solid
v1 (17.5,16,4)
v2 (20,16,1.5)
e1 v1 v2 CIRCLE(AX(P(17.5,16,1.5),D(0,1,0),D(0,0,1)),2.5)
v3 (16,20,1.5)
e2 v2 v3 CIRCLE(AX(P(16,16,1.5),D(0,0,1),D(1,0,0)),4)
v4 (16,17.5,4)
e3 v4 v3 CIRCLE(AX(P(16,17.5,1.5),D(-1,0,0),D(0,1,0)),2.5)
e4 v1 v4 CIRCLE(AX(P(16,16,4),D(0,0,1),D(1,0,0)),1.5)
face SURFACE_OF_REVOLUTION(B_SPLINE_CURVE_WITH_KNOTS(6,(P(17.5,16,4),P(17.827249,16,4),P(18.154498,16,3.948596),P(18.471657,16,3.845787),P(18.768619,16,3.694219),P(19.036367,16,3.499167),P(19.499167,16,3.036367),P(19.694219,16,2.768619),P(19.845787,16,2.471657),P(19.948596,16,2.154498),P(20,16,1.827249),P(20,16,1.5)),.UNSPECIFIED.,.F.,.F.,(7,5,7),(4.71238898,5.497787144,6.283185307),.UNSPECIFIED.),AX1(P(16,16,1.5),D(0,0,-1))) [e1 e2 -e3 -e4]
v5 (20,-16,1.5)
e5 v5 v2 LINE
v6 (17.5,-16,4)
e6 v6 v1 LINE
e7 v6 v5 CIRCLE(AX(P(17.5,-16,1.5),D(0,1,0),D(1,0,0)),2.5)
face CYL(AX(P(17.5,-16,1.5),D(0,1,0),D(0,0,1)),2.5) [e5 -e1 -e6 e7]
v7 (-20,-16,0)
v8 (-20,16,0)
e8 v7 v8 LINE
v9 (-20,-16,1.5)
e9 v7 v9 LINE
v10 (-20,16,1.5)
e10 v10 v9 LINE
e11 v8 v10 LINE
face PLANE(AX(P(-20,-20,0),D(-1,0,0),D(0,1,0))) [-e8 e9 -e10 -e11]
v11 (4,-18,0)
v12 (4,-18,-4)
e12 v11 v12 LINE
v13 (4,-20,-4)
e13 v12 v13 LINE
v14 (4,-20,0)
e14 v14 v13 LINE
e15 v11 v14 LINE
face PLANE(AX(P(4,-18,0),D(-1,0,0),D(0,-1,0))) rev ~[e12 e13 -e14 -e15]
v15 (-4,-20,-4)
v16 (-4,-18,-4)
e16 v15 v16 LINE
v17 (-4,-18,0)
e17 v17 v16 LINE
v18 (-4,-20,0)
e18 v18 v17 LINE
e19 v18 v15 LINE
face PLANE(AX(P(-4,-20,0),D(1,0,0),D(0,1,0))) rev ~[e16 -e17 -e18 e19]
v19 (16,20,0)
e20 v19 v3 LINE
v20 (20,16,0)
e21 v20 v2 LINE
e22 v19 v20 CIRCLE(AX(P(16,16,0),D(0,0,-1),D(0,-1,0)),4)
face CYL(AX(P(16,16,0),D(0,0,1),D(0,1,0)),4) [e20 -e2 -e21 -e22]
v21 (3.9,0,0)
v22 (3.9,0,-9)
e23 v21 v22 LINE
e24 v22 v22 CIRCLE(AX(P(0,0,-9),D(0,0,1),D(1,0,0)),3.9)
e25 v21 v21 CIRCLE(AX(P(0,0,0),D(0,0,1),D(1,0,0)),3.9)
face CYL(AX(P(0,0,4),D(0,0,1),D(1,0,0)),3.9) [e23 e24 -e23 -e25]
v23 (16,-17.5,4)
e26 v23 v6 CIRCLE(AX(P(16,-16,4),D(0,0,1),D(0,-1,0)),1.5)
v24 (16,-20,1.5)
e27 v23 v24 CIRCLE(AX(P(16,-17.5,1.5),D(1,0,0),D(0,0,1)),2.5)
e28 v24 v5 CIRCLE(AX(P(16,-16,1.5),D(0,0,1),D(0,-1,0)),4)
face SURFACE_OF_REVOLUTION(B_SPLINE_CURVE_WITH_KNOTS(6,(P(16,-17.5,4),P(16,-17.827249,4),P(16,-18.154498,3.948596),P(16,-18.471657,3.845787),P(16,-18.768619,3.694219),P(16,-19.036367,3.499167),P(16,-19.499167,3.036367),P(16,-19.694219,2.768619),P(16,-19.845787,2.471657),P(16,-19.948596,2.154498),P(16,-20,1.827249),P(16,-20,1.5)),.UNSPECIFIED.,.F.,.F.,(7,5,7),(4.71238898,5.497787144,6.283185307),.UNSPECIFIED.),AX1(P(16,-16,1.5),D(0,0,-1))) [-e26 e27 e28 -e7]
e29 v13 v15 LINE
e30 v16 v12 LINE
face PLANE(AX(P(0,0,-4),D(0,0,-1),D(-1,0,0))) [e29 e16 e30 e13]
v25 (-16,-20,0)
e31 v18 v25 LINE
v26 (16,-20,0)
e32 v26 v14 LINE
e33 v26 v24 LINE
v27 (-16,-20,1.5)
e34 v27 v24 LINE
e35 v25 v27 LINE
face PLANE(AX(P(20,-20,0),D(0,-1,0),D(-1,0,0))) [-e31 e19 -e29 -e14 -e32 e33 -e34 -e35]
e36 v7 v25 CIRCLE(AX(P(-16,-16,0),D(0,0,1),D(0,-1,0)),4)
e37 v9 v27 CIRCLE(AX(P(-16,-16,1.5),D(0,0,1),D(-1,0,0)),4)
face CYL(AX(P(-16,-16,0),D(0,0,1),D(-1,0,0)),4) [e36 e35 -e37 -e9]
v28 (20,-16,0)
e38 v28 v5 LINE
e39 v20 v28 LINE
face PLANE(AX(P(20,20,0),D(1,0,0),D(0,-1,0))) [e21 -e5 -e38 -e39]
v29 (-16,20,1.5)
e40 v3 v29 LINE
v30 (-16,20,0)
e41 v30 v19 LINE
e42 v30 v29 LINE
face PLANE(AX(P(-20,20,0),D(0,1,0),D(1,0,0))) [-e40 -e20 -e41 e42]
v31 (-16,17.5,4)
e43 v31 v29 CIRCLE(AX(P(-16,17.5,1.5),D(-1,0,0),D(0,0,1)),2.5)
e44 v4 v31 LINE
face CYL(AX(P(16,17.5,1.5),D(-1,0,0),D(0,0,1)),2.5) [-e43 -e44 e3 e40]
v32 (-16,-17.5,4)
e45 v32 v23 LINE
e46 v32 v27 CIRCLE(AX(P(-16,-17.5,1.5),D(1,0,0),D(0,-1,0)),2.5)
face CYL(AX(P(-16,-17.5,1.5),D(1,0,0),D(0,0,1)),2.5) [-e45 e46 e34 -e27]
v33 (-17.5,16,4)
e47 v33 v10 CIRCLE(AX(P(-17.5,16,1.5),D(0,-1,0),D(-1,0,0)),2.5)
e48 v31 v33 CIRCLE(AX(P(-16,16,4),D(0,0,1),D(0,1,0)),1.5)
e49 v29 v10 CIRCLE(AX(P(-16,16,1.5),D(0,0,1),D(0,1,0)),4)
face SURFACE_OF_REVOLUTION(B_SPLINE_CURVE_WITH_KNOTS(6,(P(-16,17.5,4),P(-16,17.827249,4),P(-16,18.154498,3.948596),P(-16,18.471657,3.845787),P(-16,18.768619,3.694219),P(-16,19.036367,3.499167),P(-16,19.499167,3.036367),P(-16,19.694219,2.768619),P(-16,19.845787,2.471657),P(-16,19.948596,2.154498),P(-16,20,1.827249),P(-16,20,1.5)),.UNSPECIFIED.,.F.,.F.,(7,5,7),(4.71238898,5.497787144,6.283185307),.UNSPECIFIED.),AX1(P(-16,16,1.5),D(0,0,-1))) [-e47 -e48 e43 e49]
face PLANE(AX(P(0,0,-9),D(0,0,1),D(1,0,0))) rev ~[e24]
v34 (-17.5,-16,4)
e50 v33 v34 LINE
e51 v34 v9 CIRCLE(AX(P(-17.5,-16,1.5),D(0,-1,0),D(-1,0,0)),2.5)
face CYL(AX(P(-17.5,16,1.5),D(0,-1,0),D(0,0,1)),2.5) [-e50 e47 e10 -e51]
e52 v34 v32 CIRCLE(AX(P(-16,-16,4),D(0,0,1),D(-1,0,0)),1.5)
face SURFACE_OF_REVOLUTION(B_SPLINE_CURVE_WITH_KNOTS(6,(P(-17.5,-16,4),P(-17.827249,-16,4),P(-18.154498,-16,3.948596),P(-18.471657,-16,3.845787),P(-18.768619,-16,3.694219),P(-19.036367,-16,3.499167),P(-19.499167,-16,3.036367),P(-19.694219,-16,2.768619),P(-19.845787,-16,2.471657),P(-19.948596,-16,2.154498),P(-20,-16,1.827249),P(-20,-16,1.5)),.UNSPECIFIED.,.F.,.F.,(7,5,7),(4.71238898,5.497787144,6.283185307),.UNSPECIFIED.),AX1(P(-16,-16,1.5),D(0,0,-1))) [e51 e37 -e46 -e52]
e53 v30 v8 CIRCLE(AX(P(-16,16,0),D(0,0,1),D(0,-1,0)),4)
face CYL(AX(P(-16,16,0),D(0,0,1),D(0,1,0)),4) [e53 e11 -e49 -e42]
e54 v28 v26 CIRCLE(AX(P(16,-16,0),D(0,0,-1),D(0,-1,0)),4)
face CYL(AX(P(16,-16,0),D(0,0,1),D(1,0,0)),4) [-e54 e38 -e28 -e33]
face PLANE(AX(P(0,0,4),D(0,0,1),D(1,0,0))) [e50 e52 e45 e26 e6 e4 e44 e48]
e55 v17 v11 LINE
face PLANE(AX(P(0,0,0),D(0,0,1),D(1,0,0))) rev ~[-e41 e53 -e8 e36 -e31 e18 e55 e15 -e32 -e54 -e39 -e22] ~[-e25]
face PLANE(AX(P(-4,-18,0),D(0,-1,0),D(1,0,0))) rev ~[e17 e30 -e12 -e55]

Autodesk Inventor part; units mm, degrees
ref_plane "YZ Plane" through (0, 0, 0) normal (1, 0, 0) x (0, 1, 0)
ref_plane "XZ Plane" through (0, 0, 0) normal (0, 1, 0) x (-1, 0, 0)
ref_plane "XY Plane" through (0, 0, 0) normal (0, 0, 1) x (1, 0, 0)
sketch "Sketch1" plane through (0, 0, 0) normal (0, 0, 1) x (1, 0, 0)
  line L0 (-20, 20) -> (20, 20)
  line L1 (20, 20) -> (20, -20)
  line L2 (20, -20) -> (-20, -20)
  line L3 (-20, -20) -> (-20, 20)
  point P0 (0, 0)
  point P1 (-20, 0)
  point P2 (0, 20)
  dimension "DimA" = 40
  dimension "DimB" = 40
extrude "Rectangluar End Cap" add sketch "Sketch1" along normal blind 4
sketch "Sketch6" plane through (0, 0, 4) normal (0, 0, 1) x (1, 0, 0)
  line L0 (-20, -20) -> (-20, 20) construction
  line L1 (20, -20) -> (-20, -20) construction
  circle A0 centre (0, 0) radius 3.9
  dimension "d37" = 20
  dimension "d38" = 20
  dimension "d39" = 7.8
extrude "Standard Post" add sketch "Sketch6" against normal blind 13
hole "Secure End Cap" [suppressed]
pattern_of_one "Rectangular Pattern3"
sketch "Sketch7" plane through (0, 0, 0) normal (0, 0, -1) x (-1, 0, 0)
  line L0 (-20, -20) -> (20, -20) construction
  line L1 (-4, -20) -> (4, -20)
  line L2 (4, -20) -> (4, -18)
  line L3 (4, -18) -> (-4, -18)
  line L4 (-4, -18) -> (-4, -20)
  line L5 (0, -18) -> (0, -20) construction
  point P0 (0, 0)
  dimension "d55" = 2
  dimension "d56" = 8
extrude "40x40 Orientation Tab" add sketch "Sketch7" along normal blind 4
fillet "Fillet5" radius 4 4 edges at (20, 20, 2) (-20, 20, 2) (-20, -20, 2) (20, -20, 2)
fillet "Fillet6" radius 2.5 8 edges at (-18.8284, -18.8284, 4) (0, -20, 4) (18.8284, -18.8284, 4) (20, 0, 4) (18.8284, 18.8284, 4) (0, 20, 4) (-18.8284, 18.8284, 4) (-20, 0, 4)
properties part number "18-813" material "Glass Filled Nylon"
